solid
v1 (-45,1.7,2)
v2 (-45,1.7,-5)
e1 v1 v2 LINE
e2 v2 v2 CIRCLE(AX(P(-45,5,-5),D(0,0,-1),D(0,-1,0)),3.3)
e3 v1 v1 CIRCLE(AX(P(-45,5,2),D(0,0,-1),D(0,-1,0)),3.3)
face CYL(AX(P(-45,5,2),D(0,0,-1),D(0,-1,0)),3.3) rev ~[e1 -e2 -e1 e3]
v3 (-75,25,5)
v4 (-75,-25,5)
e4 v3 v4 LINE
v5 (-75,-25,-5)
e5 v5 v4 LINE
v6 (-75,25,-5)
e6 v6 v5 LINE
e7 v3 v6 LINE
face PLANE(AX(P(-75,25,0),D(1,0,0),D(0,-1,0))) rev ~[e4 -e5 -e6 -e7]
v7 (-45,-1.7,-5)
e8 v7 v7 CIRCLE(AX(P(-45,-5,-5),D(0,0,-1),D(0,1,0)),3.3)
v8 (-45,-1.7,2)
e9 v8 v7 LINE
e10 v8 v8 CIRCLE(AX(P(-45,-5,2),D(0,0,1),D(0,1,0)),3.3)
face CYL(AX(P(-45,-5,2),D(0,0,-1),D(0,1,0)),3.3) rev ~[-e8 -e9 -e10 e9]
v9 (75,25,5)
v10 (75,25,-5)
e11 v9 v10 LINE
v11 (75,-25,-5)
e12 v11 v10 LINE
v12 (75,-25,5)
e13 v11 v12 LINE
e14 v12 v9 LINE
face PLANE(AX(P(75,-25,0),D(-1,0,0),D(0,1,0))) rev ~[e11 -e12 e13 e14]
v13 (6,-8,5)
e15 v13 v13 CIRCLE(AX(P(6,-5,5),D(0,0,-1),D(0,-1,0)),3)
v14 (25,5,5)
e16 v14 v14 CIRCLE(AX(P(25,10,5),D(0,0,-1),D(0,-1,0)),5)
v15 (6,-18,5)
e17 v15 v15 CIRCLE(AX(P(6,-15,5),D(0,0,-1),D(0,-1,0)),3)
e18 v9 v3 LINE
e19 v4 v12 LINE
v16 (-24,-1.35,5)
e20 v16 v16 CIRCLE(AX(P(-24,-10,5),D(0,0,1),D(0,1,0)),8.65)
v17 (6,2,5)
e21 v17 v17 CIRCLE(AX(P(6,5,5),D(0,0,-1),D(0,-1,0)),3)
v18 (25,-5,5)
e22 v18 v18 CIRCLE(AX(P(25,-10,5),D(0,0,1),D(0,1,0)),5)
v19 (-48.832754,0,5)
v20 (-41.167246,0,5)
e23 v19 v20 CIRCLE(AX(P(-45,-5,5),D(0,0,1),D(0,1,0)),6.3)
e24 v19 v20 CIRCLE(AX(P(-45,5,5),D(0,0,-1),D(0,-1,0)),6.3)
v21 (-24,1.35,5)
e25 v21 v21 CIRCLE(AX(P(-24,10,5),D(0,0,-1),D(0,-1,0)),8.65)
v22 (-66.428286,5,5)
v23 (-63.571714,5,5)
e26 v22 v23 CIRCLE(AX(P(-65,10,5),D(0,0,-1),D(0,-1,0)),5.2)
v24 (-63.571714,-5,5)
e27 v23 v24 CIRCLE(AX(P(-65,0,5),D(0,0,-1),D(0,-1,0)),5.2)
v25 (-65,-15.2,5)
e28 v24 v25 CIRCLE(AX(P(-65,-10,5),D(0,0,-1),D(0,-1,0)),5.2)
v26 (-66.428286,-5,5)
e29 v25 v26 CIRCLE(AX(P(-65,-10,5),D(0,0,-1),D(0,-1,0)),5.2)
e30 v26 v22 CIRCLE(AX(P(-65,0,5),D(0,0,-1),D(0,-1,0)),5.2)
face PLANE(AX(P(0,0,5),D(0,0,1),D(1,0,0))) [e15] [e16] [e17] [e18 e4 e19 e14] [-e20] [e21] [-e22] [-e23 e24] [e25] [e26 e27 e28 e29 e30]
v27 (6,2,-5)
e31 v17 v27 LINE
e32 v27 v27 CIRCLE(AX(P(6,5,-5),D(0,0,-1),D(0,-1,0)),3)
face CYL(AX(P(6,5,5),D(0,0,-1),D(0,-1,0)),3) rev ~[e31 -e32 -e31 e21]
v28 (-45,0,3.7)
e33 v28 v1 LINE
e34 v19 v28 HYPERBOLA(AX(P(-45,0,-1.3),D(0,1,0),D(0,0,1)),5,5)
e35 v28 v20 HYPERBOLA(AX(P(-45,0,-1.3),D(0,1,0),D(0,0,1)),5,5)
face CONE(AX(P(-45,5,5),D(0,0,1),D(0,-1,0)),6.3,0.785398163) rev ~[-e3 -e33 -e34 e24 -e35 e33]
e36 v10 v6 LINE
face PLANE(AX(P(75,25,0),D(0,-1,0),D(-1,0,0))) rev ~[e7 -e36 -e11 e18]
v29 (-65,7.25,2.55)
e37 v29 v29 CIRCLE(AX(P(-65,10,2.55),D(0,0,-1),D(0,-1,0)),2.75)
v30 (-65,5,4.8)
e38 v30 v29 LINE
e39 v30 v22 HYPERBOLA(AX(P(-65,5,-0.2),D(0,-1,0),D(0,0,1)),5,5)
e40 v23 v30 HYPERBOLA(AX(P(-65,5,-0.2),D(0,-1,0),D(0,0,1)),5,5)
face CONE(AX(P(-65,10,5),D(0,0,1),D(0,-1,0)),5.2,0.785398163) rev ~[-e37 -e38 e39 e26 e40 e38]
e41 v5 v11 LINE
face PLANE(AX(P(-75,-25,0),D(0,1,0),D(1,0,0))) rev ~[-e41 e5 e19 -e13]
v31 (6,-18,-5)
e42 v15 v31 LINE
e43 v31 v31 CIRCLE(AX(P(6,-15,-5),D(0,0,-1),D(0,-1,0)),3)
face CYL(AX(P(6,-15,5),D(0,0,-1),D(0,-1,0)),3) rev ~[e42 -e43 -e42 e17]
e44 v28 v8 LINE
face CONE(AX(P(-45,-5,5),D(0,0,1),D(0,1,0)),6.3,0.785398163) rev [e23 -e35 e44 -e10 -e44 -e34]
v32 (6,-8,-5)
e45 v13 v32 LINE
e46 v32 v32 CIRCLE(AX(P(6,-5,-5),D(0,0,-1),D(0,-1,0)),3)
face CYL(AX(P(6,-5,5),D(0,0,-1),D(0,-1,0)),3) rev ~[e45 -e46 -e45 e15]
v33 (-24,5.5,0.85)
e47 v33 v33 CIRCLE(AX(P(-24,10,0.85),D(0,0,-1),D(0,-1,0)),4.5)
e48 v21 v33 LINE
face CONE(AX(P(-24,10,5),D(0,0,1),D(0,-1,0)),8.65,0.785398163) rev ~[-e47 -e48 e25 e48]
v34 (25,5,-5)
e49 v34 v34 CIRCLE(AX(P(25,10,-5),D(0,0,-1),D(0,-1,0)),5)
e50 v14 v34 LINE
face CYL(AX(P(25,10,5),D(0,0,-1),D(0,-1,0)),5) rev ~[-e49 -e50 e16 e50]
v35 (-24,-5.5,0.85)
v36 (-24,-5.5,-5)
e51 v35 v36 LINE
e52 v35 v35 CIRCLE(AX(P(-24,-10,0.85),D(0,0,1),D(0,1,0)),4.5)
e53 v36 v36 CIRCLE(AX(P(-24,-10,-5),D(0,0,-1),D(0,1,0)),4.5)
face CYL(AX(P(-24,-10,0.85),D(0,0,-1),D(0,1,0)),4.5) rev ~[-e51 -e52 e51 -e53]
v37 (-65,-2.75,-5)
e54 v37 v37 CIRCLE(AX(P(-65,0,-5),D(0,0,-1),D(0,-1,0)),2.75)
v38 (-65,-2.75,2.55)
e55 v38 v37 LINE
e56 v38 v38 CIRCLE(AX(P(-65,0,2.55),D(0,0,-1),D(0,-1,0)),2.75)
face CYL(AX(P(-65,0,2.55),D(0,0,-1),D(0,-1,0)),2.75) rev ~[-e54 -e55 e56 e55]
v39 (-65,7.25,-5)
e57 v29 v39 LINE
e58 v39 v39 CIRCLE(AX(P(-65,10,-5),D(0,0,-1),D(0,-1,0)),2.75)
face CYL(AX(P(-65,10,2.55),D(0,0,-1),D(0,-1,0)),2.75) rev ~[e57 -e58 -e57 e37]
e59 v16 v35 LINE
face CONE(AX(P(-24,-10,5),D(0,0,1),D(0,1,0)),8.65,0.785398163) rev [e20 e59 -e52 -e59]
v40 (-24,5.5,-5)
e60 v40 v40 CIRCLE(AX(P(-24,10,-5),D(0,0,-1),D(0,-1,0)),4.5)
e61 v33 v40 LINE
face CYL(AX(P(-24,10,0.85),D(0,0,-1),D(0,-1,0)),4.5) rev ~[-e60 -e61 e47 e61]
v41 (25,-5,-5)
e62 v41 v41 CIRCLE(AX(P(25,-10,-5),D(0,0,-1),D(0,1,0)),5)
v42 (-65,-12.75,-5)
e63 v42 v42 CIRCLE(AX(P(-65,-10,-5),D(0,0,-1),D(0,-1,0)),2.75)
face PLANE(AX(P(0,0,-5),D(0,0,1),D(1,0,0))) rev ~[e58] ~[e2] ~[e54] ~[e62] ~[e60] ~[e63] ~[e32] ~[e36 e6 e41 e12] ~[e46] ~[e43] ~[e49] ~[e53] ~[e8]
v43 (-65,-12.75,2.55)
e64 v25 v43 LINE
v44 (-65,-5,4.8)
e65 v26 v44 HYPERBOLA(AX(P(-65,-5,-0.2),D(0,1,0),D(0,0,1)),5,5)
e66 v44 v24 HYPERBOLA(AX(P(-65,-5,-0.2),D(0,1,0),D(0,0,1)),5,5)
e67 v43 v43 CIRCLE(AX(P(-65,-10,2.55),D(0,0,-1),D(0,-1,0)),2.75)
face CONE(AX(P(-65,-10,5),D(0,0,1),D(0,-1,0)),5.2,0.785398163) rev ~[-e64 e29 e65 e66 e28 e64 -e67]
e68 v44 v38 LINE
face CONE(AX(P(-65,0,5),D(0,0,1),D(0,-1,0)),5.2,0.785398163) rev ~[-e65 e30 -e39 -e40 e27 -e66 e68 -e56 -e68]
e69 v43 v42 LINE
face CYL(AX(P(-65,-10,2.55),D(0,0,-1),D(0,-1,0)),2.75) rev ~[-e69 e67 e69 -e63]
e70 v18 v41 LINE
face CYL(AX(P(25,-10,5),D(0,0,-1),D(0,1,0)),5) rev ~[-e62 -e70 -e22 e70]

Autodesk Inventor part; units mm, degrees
ref_plane "YZ Plane" through (0, 0, 0) normal (1, 0, 0) x (0, 1, 0)
ref_plane "XZ Plane" through (0, 0, 0) normal (0, 1, 0) x (-1, 0, 0)
ref_plane "XY Plane" through (0, 0, 0) normal (0, 0, 1) x (1, 0, 0)
sketch "Sketch2" plane through (0, 0, 0) normal (0, 0, 1) x (1, 0, 0)
  line L0 (-75, -25) -> (75, -25)
  line L1 (75, -25) -> (75, 25)
  line L2 (75, 25) -> (-75, 25)
  line L3 (-75, 25) -> (-75, -25)
  line L4 (-75, -25) -> (75, 25) construction
  line L5 (75, -25) -> (-75, 25) construction
  point P0 (0, 0)
  dimension "d1" = 150
  dimension "d2" = 50
extrude "Extrusion1" add sketch "Sketch2" along normal mid plane 10
sketch "Sketch3" plane through (0, 0, 5) normal (0, 0, 1) x (1, 0, 0)
  line L0 (-75, 25) -> (-75, -25) projected
  line L1 (75, 25) -> (-75, 25) projected
  point P0 (0, 0)
  point P1 (-65, 0)
  dimension "d40" = 10
  dimension "d43" = 25
hole "Hole1" at (-65, 0, 5) direction (0, 0, -1) diameter 5.5 depth 14.2 tip angle 118 countersink diameter 10.4 countersink angle 90 clearance for "Counter Sink" size "M5" standard "TS Profile"
sketch "Sketch4" plane through (0, 0, 5) normal (0, 0, 1) x (1, 0, 0)
  line L0 (-75, 25) -> (-75, -25) projected
  line L1 (75, 25) -> (-75, 25) projected
  point P0 (0, 0)
  point P1 (-45, 5)
  dimension "d41" = 30
  dimension "d42" = 20
hole "Hole2" at (-45, 5, 5) direction (0, 0, -1) diameter 6.6 depth 17.1 tip angle 118 countersink diameter 12.6 countersink angle 90 clearance for "Counter Sink" size "M6" standard "TS Profile"
sketch "Sketch5" plane through (0, 0, 5) normal (0, 0, 1) x (1, 0, 0)
  line L0 (-75, 25) -> (-75, -25) projected
  line L1 (75, 25) -> (-75, 25) projected
  point P0 (0, 0)
  point P1 (-24, 10)
  dimension "d44" = 51
  dimension "d45" = 15
hole "Hole3" at (-24, 10, 5) direction (0, 0, -1) diameter 9 depth 22.2 tip angle 118 countersink diameter 17.3 countersink angle 90 clearance for "Counter Sink" size "M8" standard "TS Profile"
sketch "Sketch6" plane through (0, 0, 5) normal (0, 0, 1) x (1, 0, 0)
  line L0 (-75, 25) -> (-75, -25) projected
  line L1 (75, 25) -> (-75, 25) projected
  point P0 (0, 0)
  point P1 (6, 5)
  dimension "d46" = 81
  dimension "d47" = 20
hole "Hole4" at (6, 5, 5) direction (0, 0, -1) diameter 6 depth 14.2 tip angle 118
sketch "Sketch7" plane through (0, 0, 5) normal (0, 0, 1) x (1, 0, 0)
  line L0 (-75, 25) -> (-75, -25) projected
  line L1 (75, 25) -> (-75, 25) projected
  point P0 (0, 0)
  point P1 (25, 10)
  dimension "d48" = 100
  dimension "d49" = 15
hole "Hole5" at (25, 10, 5) direction (0, 0, -1) diameter 10 depth 14.2 tip angle 118
pattern_linear "Rectangular Pattern1" count 3 spacing 10 along (0, -1, 0) of "Hole1" first direction both ways yes
mirror "Mirror1" about plane through (0, 0, 0) normal (0, 1, 0) of "Hole2"
mirror "Mirror2" about plane through (0, 0, 0) normal (0, 1, 0) of "Hole3"
pattern_linear "Rectangular Pattern2" count 3 spacing 10 along (0, -1, 0) of "Hole4"
mirror "Mirror3" about plane through (0, 0, 0) normal (0, 1, 0) of "Hole5"
properties part number "홀간 거리 확인 파트-13" material "SS400"
